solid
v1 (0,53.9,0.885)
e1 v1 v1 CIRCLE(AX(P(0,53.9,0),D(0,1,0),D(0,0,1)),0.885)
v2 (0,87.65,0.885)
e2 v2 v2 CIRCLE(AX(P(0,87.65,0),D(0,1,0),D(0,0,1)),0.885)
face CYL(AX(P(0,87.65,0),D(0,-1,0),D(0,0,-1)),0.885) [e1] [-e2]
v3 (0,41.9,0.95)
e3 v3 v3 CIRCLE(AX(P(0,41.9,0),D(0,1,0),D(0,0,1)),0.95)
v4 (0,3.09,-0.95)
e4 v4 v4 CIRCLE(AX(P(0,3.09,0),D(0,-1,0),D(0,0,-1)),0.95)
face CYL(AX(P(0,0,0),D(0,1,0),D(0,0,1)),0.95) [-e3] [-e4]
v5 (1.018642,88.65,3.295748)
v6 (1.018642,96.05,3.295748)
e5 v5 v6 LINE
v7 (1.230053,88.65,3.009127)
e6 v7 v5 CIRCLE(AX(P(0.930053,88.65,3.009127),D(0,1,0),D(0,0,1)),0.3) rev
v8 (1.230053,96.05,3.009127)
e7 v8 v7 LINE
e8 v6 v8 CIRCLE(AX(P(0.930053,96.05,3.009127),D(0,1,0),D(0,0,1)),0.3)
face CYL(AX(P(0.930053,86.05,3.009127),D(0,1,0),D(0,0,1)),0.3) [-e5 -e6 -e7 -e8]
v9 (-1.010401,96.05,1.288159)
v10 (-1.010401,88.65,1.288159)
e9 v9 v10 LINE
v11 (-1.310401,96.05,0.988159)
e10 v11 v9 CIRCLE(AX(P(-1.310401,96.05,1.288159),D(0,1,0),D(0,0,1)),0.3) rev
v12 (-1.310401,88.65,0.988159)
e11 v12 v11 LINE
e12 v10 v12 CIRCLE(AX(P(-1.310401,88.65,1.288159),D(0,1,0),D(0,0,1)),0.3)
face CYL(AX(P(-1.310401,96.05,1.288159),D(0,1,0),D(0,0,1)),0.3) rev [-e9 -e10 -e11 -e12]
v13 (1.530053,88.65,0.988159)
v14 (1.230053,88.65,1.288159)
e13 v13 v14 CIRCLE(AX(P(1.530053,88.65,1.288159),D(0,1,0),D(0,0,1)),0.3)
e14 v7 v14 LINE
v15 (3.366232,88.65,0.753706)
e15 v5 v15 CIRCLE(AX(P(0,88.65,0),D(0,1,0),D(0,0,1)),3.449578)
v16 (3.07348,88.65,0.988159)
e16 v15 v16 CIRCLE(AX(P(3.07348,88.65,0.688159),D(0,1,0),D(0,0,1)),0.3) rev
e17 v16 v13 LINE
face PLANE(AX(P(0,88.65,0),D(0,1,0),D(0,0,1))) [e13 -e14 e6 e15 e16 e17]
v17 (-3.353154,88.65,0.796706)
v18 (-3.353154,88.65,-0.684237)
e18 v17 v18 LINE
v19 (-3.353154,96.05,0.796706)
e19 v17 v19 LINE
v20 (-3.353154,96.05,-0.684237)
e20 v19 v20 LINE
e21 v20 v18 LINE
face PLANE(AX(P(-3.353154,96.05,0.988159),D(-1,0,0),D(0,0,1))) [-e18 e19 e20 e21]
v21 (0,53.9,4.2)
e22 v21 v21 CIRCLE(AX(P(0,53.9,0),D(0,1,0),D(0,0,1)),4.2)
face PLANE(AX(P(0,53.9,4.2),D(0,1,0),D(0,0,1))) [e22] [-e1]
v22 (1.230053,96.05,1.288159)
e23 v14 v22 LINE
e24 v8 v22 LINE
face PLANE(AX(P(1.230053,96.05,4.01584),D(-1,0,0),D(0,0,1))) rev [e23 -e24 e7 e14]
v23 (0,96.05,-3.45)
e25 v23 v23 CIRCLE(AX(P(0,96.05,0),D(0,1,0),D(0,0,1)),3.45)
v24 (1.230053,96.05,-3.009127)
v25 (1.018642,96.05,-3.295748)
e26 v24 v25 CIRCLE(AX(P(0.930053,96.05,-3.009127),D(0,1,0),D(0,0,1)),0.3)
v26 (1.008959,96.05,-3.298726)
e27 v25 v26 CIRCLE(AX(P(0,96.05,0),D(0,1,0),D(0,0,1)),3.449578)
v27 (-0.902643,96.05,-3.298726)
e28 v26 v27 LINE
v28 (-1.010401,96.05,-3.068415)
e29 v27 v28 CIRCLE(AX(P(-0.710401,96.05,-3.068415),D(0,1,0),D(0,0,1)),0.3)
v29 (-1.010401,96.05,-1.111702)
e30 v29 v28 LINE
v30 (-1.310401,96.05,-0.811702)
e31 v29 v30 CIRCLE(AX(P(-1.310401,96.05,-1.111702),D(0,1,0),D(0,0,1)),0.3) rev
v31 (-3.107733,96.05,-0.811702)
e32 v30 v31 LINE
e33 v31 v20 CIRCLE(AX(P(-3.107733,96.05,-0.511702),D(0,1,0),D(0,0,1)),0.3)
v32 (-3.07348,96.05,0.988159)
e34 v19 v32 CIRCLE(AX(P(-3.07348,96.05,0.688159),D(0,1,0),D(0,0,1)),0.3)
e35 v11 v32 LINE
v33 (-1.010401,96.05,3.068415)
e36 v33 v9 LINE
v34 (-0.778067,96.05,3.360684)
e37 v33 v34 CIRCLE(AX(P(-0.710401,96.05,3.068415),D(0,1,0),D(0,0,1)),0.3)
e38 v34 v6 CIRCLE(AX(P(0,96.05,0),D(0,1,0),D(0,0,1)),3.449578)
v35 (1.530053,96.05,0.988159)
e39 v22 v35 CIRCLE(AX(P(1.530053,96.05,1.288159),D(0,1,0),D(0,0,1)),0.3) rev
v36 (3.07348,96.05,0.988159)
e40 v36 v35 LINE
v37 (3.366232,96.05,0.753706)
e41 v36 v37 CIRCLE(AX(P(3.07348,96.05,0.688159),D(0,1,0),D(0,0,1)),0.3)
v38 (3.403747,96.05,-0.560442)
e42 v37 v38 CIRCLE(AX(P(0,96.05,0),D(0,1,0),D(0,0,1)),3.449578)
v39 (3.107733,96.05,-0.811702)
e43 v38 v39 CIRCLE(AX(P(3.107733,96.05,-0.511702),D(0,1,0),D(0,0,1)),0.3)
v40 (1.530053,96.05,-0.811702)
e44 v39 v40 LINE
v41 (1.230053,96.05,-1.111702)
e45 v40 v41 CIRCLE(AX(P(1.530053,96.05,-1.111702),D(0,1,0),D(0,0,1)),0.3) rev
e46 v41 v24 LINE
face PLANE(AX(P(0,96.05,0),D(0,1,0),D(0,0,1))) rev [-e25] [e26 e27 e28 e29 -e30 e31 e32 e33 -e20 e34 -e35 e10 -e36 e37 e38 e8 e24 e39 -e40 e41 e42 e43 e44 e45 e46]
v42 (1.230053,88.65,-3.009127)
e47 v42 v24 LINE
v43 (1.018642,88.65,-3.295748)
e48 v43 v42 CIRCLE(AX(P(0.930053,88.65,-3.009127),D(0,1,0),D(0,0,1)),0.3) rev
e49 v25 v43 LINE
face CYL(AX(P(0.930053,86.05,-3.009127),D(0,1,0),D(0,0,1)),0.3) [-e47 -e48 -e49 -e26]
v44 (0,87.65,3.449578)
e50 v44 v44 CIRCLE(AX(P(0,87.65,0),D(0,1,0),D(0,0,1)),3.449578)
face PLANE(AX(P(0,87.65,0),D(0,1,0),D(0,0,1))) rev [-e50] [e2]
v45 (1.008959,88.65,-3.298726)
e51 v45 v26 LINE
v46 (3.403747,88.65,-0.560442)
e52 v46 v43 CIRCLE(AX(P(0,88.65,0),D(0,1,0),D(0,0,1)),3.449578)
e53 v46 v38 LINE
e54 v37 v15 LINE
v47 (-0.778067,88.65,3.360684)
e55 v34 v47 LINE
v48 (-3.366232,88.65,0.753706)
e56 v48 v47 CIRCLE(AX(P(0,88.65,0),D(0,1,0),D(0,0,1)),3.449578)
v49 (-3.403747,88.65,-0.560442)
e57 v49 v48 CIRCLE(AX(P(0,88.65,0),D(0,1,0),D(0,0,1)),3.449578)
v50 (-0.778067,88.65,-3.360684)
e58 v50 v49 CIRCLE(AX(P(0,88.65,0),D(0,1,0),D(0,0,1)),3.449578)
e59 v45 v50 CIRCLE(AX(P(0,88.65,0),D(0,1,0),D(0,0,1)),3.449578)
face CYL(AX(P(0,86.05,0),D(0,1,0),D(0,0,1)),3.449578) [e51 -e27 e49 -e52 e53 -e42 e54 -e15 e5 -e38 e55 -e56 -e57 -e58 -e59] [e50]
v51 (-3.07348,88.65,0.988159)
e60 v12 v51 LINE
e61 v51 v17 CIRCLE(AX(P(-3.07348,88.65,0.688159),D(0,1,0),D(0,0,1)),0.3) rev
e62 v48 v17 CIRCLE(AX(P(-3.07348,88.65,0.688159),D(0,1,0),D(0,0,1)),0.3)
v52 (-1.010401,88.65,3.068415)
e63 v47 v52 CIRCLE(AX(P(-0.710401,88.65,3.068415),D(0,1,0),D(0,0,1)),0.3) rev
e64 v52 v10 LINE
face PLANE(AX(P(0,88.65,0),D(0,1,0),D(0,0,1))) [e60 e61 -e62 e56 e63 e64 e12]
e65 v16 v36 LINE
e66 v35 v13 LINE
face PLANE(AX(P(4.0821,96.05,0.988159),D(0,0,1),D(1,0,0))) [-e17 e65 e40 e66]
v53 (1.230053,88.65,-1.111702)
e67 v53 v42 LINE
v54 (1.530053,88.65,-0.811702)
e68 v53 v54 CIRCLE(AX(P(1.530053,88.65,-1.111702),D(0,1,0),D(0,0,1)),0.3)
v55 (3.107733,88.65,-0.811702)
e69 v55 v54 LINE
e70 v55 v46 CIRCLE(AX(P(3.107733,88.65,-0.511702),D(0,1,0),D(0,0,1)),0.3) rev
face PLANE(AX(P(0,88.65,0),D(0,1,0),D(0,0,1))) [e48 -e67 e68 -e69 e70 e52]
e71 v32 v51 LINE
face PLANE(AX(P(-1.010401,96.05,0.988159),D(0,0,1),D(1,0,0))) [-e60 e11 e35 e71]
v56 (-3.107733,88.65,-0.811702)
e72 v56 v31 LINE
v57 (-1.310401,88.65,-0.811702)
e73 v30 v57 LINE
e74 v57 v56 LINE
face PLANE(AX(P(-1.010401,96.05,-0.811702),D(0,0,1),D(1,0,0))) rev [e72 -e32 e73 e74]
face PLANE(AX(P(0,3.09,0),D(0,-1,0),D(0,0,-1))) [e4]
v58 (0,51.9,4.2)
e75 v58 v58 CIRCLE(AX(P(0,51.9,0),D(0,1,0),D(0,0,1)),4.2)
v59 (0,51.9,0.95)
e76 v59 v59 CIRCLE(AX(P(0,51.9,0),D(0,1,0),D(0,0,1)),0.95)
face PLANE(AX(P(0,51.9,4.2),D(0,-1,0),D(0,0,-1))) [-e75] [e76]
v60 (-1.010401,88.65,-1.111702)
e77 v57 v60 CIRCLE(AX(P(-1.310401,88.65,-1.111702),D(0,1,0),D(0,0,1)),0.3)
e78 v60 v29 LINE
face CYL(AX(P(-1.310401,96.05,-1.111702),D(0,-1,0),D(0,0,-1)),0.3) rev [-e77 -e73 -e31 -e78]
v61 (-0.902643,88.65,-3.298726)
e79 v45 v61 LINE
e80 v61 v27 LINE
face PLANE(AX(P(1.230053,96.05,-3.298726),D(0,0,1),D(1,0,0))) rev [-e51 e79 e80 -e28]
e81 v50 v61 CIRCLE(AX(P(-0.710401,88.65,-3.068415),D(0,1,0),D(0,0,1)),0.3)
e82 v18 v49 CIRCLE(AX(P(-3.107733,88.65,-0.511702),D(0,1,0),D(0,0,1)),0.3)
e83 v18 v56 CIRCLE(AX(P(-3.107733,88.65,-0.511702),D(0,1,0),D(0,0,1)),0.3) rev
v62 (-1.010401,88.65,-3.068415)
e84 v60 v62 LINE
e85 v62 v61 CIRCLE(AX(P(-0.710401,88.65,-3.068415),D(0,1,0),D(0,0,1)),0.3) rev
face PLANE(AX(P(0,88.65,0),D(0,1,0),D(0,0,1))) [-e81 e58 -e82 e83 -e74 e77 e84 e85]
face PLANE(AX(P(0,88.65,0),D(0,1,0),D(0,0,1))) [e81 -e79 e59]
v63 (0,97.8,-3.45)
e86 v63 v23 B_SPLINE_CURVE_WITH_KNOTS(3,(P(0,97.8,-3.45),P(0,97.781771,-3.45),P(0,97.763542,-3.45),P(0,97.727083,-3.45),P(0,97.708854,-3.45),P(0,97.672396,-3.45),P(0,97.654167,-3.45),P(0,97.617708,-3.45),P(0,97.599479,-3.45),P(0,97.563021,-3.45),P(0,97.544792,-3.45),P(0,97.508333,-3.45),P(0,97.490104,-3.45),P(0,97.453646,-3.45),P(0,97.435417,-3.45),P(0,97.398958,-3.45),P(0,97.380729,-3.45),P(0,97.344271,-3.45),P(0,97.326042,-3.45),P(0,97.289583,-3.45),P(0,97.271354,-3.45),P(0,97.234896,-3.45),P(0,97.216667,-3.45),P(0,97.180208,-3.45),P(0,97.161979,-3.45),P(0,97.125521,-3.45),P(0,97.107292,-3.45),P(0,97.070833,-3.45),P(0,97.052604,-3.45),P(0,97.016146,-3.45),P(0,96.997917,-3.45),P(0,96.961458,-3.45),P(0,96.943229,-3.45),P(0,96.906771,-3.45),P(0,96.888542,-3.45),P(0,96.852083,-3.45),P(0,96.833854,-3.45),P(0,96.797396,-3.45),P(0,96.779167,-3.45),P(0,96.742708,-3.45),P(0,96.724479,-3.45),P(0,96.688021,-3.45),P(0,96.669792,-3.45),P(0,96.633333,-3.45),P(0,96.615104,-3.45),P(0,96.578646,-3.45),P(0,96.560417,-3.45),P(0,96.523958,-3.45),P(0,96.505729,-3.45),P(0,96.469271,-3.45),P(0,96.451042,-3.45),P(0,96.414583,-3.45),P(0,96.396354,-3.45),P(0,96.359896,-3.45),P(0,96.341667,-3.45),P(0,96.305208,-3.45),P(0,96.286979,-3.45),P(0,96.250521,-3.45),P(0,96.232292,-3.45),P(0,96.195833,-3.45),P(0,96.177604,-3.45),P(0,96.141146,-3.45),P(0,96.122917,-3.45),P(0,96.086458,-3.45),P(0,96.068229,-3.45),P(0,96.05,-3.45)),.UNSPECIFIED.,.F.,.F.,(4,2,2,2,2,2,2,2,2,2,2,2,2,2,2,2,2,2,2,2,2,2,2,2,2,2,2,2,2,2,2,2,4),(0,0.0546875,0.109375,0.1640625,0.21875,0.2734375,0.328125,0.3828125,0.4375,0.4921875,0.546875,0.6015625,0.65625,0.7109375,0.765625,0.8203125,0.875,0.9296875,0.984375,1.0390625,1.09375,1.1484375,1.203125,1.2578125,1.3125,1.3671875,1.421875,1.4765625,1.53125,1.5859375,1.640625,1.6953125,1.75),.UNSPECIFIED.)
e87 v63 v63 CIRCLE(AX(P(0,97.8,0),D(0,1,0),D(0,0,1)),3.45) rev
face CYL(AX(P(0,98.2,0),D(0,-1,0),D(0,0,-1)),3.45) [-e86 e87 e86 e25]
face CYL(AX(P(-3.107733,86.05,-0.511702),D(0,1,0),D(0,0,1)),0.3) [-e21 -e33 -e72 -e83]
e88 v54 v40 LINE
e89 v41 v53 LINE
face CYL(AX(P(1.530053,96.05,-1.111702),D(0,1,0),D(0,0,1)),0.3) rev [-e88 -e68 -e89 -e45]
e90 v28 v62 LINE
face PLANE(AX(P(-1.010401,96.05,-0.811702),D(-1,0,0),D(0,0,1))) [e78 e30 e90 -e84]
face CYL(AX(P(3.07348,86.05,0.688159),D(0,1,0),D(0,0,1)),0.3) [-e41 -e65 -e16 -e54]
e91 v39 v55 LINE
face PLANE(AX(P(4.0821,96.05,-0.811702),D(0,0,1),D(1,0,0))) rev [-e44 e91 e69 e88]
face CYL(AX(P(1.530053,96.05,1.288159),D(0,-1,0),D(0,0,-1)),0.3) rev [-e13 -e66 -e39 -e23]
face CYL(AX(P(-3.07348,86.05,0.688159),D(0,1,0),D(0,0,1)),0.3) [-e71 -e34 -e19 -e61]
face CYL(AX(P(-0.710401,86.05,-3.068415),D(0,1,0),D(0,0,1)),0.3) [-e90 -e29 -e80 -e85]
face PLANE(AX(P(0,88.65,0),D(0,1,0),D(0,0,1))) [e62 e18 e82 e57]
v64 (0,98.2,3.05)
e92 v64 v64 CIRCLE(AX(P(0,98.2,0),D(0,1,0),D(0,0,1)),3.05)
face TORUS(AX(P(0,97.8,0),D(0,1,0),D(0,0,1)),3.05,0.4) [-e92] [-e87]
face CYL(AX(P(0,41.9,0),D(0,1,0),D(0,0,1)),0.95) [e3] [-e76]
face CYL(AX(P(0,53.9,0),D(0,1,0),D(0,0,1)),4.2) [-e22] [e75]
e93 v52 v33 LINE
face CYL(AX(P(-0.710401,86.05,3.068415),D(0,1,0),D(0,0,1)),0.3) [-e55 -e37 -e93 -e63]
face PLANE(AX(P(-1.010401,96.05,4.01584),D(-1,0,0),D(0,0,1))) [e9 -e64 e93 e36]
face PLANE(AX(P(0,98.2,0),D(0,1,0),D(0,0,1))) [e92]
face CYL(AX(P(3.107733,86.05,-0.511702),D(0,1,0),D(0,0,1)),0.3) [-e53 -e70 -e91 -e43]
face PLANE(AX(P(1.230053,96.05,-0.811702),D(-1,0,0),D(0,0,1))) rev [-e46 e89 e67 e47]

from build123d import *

# Parameters (mm, degrees)
SKETCH1_R           = 0.95
SKETCH5_W           = 4.2
SKETCH5_H           = 2
SKETCH6_R           = 0.885
BOSS_EXTRUDE1_DEPTH = 33.75
SKETCH7_R           = 3.45
BOSS_EXTRUDE2_DEPTH = 1
BOSS_EXTRUDE3_DEPTH = 7.4
SKETCH11_R          = 3.45
BOSS_EXTRUDE4_DEPTH = 2.15
SKETCH12_R          = 5.053108697
SKETCH12_R_2        = 3.449578042
CUT_EXTRUDE1_DEPTH  = 10
FILLET4_R           = 0.4
FILLET5_R           = 0.3
CUT_EXTRUDE2_START  = -3.09
SKETCH15_R          = 0.95
CUT_EXTRUDE2_DEPTH  = 3.09


with BuildPart() as part:
    # Sweep1: sweep along a path in Sketch2
    with BuildLine(Plane(origin=(0, 0, 0), x_dir=(0, 0, -1), z_dir=(1, 0, 0))) as sweep1_path:
        Line((0, 0), (0, 41.9))
        Line((0, 41.9), (0, 51.9))
    # Sketch1 → Sweep1 (sweep)
    with BuildSketch(Plane(origin=(0, 0, 0), x_dir=(1, 0, 0), z_dir=(0, 1, 0))):
        Circle(SKETCH1_R)
    sweep(path=sweep1_path.line)

    # Sketch5 → Revolve1 (revolve)
    with BuildSketch(Plane(origin=(0, 0, 0), x_dir=(0, 0, -1), z_dir=(1, 0, 0))):
        with Locations((-2.1, 52.9)):
            Rectangle(SKETCH5_W, SKETCH5_H)
    revolve(axis=Axis((0, 53.9, 0), (0, -1, 0)))

    # Sketch6 → Boss-Extrude1 (add)
    with BuildSketch(Plane(origin=(0, 53.9, 0), x_dir=(1, 0, 0), z_dir=(0, 1, 0))):
        with Locations(Location((0, 0, 0), (0, 0, 270))):
            Circle(SKETCH6_R)
    extrude(amount=BOSS_EXTRUDE1_DEPTH)

    # Sketch7 → Boss-Extrude2 (add)
    with BuildSketch(Plane(origin=(0, 87.65, 0), x_dir=(1, 0, 0), z_dir=(0, 1, 0))):
        with Locations(Location((0, 0, 0), (0, 0, 270))):
            Circle(SKETCH7_R)
    extrude(amount=BOSS_EXTRUDE2_DEPTH)

    # Sketch8 → Boss-Extrude3 (add)
    with BuildSketch(Plane(origin=(0, 88.65, 0), x_dir=(1, 0, 0), z_dir=(0, 1, 0))):
        Polygon((1.230053166, 0.811701691), (1.230053166, 3.298725541), (-1.010400815, 3.298725541), (-1.010400815, 0.811701691), (-3.353153794, 0.811701691), (-3.353153794, -0.988158581), (-1.010400815, -0.988158581), (-1.010400815, -4.015839789), (1.230053166, -4.015839789), (1.230053166, -0.988158581), (4.082100271, -0.988158581), (4.082100271, 0.811701691), align=None)
    extrude(amount=BOSS_EXTRUDE3_DEPTH)

    # Sketch11 → Boss-Extrude4 (add)
    with BuildSketch(Plane(origin=(0, 96.05, 0), x_dir=(1, 0, 0), z_dir=(0, 1, 0))):
        with Locations(Location((0, 0, 0), (0, 0, 107.029845203))):
            Circle(SKETCH11_R)
    extrude(amount=BOSS_EXTRUDE4_DEPTH)

    # Sketch12 → Cut-Extrude1 (cut)
    with BuildSketch(Plane(origin=(0, 96.05, 0), x_dir=(1, 0, 0), z_dir=(0, 1, 0))):
        Circle(SKETCH12_R)
        with Locations(Location((0, 0, 0), (0, 0, 270))):
            Circle(SKETCH12_R_2, mode=Mode.SUBTRACT)
    extrude(amount=-CUT_EXTRUDE1_DEPTH, mode=Mode.SUBTRACT)

    # Fillet4
    fillet4_edges = [part.edges().sort_by_distance(p)[0] for p in [
        (1.010400815, 98.2, 3.298725541),
    ]]
    fillet(fillet4_edges, radius=FILLET4_R)

    # Fillet5
    # the kernel refuses this fillet: 0.3 mm, written as the material it adds along each edge
    with BuildSketch(Plane(origin=(-1.010400815, 87.9, -0.811701691), x_dir=(-1, 0, 0), z_dir=(0, 1, 0)), Plane(origin=(-1.010400815, 87.9, 0.988158581), x_dir=(0, 0, 1), z_dir=(0, 1, 0)), Plane(origin=(1.230053166, 87.9, -0.811701691), x_dir=(0, 0, -1), z_dir=(0, 1, 0)), Plane(origin=(1.230053166, 87.9, 0.988158581), x_dir=(1, 0, 0), z_dir=(0, 1, 0))) as fillet5_piece_1:
        with BuildLine():
            CenterArc((FILLET5_R, -FILLET5_R), FILLET5_R, 90, 90)
            Line((0, -FILLET5_R), (0, 0))
            Line((0, 0), (FILLET5_R, 0))
        make_face()
    extrude(amount=8.9)
    # the kernel refuses this fillet: 0.3 mm, written as the material it takes off along each edge
    with BuildSketch(Plane(origin=(1.230053166, 88.65, -3.222818313), x_dir=(-0.9453321678939596, 0, -0.32610901911003093), z_dir=(0, 1, 0))) as fillet5_2_piece_1:
        with BuildLine():
            CenterArc((0.213912859, 0.299842347), FILLET5_R, 199.032778114, 72.824800523)
            Line((-0.069686792, 0.202009641), (0, 0))
            ThreePointArc((0, 0), (0.111818707, -0.001812788), (0.223637414, 0))
        make_face()
    extrude(amount=7.4, mode=Mode.SUBTRACT)
    with BuildSketch(Plane(origin=(-1.010400815, 88.65, -3.29828423), x_dir=(0.9657732786653868, 0, -0.2593876909491066), z_dir=(0, 1, 0))) as fillet5_2_piece_2:
        with BuildLine():
            CenterArc((0.230106816, -0.299817566), FILLET5_R, 88.00174108, 76.964525917)
            Line((-0.059625168, -0.222001259), (0, 0))
            ThreePointArc((0, 0), (0.120283777, 0.002097733), (0.240567554, 0))
        make_face()
    extrude(amount=7.4, mode=Mode.SUBTRACT)
    with BuildSketch(Plane(origin=(-3.352719647, 88.65, -0.811701691), x_dir=(-0.1990231654762503, 0, 0.9799947854982765), z_dir=(0, 1, 0))) as fillet5_2_piece_3:
        with BuildLine():
            CenterArc((0.24524038, 0.299792772), FILLET5_R, 191.479842228, 80.649895998)
            Line((-0.048758056, 0.240085822), (0, 0))
            ThreePointArc((0, 0), (0.128194548, -0.002382831), (0.256389095, 0))
        make_face()
    extrude(amount=7.4, mode=Mode.SUBTRACT)
    with BuildSketch(Plane(origin=(-3.30501608, 88.65, 0.988158581), x_dir=(-0.2526309264333675, 0, -0.9675627189022004), z_dir=(0, 1, 0))) as fillet5_2_piece_4:
        with BuildLine():
            CenterArc((0.231775654, -0.29981491), FILLET5_R, 87.987242866, 77.37950549)
            Line((-0.058493162, -0.224025632), (0, 0))
            ThreePointArc((0, 0), (0.121156129, 0.00212828), (0.242312258, 0))
        make_face()
    extrude(amount=7.4, mode=Mode.SUBTRACT)
    with BuildSketch(Plane(origin=(-1.010400815, 88.65, 3.29828423), x_dir=(0.9657732786653864, 0, 0.25938769094910785), z_dir=(0, 1, 0))) as fillet5_2_piece_5:
        with BuildLine():
            CenterArc((0.230106816, 0.299817566), FILLET5_R, 195.033733003, 76.964525917)
            Line((-0.059625168, 0.222001259), (0, 0))
            ThreePointArc((0, 0), (0.120283777, -0.002097733), (0.240567554, 0))
        make_face()
    extrude(amount=7.4, mode=Mode.SUBTRACT)
    with BuildSketch(Plane(origin=(1.230053166, 88.65, 3.222818313), x_dir=(-0.9453321678939602, 0, 0.32610901911002915), z_dir=(0, 1, 0))) as fillet5_2_piece_6:
        with BuildLine():
            CenterArc((0.213912859, -0.299842347), FILLET5_R, 88.142421362, 72.824800523)
            Line((-0.069686792, -0.202009641), (0, 0))
            ThreePointArc((0, 0), (0.111818707, 0.001812788), (0.223637414, 0))
        make_face()
    extrude(amount=7.4, mode=Mode.SUBTRACT)
    with BuildSketch(Plane(origin=(3.30501608, 88.65, 0.988158581), x_dir=(0.2526309264333699, 0, -0.9675627189021997), z_dir=(0, 1, 0))) as fillet5_2_piece_7:
        with BuildLine():
            CenterArc((0.231775654, 0.29981491), FILLET5_R, 194.633251644, 77.37950549)
            Line((-0.058493162, 0.224025632), (0, 0))
            ThreePointArc((0, 0), (0.121156129, -0.00212828), (0.242312258, 0))
        make_face()
    extrude(amount=7.4, mode=Mode.SUBTRACT)
    with BuildSketch(Plane(origin=(3.352719647, 88.65, -0.811701691), x_dir=(0.19902316547625037, 0, 0.9799947854982765), z_dir=(0, 1, 0))) as fillet5_2_piece_8:
        with BuildLine():
            CenterArc((0.24524038, -0.299792772), FILLET5_R, 87.870261774, 80.649895998)
            Line((-0.048758056, -0.240085822), (0, 0))
            ThreePointArc((0, 0), (0.128194548, 0.002382831), (0.256389095, 0))
        make_face()
    extrude(amount=7.4, mode=Mode.SUBTRACT)

    # Sketch15 → Cut-Extrude2 (cut)
    with BuildSketch(Plane.XZ.offset(CUT_EXTRUDE2_START)):
        with Locations(Location((0, 0, 0), (0, 0, 90))):
            Circle(SKETCH15_R)
    extrude(amount=CUT_EXTRUDE2_DEPTH, mode=Mode.SUBTRACT)


solid = part.part
